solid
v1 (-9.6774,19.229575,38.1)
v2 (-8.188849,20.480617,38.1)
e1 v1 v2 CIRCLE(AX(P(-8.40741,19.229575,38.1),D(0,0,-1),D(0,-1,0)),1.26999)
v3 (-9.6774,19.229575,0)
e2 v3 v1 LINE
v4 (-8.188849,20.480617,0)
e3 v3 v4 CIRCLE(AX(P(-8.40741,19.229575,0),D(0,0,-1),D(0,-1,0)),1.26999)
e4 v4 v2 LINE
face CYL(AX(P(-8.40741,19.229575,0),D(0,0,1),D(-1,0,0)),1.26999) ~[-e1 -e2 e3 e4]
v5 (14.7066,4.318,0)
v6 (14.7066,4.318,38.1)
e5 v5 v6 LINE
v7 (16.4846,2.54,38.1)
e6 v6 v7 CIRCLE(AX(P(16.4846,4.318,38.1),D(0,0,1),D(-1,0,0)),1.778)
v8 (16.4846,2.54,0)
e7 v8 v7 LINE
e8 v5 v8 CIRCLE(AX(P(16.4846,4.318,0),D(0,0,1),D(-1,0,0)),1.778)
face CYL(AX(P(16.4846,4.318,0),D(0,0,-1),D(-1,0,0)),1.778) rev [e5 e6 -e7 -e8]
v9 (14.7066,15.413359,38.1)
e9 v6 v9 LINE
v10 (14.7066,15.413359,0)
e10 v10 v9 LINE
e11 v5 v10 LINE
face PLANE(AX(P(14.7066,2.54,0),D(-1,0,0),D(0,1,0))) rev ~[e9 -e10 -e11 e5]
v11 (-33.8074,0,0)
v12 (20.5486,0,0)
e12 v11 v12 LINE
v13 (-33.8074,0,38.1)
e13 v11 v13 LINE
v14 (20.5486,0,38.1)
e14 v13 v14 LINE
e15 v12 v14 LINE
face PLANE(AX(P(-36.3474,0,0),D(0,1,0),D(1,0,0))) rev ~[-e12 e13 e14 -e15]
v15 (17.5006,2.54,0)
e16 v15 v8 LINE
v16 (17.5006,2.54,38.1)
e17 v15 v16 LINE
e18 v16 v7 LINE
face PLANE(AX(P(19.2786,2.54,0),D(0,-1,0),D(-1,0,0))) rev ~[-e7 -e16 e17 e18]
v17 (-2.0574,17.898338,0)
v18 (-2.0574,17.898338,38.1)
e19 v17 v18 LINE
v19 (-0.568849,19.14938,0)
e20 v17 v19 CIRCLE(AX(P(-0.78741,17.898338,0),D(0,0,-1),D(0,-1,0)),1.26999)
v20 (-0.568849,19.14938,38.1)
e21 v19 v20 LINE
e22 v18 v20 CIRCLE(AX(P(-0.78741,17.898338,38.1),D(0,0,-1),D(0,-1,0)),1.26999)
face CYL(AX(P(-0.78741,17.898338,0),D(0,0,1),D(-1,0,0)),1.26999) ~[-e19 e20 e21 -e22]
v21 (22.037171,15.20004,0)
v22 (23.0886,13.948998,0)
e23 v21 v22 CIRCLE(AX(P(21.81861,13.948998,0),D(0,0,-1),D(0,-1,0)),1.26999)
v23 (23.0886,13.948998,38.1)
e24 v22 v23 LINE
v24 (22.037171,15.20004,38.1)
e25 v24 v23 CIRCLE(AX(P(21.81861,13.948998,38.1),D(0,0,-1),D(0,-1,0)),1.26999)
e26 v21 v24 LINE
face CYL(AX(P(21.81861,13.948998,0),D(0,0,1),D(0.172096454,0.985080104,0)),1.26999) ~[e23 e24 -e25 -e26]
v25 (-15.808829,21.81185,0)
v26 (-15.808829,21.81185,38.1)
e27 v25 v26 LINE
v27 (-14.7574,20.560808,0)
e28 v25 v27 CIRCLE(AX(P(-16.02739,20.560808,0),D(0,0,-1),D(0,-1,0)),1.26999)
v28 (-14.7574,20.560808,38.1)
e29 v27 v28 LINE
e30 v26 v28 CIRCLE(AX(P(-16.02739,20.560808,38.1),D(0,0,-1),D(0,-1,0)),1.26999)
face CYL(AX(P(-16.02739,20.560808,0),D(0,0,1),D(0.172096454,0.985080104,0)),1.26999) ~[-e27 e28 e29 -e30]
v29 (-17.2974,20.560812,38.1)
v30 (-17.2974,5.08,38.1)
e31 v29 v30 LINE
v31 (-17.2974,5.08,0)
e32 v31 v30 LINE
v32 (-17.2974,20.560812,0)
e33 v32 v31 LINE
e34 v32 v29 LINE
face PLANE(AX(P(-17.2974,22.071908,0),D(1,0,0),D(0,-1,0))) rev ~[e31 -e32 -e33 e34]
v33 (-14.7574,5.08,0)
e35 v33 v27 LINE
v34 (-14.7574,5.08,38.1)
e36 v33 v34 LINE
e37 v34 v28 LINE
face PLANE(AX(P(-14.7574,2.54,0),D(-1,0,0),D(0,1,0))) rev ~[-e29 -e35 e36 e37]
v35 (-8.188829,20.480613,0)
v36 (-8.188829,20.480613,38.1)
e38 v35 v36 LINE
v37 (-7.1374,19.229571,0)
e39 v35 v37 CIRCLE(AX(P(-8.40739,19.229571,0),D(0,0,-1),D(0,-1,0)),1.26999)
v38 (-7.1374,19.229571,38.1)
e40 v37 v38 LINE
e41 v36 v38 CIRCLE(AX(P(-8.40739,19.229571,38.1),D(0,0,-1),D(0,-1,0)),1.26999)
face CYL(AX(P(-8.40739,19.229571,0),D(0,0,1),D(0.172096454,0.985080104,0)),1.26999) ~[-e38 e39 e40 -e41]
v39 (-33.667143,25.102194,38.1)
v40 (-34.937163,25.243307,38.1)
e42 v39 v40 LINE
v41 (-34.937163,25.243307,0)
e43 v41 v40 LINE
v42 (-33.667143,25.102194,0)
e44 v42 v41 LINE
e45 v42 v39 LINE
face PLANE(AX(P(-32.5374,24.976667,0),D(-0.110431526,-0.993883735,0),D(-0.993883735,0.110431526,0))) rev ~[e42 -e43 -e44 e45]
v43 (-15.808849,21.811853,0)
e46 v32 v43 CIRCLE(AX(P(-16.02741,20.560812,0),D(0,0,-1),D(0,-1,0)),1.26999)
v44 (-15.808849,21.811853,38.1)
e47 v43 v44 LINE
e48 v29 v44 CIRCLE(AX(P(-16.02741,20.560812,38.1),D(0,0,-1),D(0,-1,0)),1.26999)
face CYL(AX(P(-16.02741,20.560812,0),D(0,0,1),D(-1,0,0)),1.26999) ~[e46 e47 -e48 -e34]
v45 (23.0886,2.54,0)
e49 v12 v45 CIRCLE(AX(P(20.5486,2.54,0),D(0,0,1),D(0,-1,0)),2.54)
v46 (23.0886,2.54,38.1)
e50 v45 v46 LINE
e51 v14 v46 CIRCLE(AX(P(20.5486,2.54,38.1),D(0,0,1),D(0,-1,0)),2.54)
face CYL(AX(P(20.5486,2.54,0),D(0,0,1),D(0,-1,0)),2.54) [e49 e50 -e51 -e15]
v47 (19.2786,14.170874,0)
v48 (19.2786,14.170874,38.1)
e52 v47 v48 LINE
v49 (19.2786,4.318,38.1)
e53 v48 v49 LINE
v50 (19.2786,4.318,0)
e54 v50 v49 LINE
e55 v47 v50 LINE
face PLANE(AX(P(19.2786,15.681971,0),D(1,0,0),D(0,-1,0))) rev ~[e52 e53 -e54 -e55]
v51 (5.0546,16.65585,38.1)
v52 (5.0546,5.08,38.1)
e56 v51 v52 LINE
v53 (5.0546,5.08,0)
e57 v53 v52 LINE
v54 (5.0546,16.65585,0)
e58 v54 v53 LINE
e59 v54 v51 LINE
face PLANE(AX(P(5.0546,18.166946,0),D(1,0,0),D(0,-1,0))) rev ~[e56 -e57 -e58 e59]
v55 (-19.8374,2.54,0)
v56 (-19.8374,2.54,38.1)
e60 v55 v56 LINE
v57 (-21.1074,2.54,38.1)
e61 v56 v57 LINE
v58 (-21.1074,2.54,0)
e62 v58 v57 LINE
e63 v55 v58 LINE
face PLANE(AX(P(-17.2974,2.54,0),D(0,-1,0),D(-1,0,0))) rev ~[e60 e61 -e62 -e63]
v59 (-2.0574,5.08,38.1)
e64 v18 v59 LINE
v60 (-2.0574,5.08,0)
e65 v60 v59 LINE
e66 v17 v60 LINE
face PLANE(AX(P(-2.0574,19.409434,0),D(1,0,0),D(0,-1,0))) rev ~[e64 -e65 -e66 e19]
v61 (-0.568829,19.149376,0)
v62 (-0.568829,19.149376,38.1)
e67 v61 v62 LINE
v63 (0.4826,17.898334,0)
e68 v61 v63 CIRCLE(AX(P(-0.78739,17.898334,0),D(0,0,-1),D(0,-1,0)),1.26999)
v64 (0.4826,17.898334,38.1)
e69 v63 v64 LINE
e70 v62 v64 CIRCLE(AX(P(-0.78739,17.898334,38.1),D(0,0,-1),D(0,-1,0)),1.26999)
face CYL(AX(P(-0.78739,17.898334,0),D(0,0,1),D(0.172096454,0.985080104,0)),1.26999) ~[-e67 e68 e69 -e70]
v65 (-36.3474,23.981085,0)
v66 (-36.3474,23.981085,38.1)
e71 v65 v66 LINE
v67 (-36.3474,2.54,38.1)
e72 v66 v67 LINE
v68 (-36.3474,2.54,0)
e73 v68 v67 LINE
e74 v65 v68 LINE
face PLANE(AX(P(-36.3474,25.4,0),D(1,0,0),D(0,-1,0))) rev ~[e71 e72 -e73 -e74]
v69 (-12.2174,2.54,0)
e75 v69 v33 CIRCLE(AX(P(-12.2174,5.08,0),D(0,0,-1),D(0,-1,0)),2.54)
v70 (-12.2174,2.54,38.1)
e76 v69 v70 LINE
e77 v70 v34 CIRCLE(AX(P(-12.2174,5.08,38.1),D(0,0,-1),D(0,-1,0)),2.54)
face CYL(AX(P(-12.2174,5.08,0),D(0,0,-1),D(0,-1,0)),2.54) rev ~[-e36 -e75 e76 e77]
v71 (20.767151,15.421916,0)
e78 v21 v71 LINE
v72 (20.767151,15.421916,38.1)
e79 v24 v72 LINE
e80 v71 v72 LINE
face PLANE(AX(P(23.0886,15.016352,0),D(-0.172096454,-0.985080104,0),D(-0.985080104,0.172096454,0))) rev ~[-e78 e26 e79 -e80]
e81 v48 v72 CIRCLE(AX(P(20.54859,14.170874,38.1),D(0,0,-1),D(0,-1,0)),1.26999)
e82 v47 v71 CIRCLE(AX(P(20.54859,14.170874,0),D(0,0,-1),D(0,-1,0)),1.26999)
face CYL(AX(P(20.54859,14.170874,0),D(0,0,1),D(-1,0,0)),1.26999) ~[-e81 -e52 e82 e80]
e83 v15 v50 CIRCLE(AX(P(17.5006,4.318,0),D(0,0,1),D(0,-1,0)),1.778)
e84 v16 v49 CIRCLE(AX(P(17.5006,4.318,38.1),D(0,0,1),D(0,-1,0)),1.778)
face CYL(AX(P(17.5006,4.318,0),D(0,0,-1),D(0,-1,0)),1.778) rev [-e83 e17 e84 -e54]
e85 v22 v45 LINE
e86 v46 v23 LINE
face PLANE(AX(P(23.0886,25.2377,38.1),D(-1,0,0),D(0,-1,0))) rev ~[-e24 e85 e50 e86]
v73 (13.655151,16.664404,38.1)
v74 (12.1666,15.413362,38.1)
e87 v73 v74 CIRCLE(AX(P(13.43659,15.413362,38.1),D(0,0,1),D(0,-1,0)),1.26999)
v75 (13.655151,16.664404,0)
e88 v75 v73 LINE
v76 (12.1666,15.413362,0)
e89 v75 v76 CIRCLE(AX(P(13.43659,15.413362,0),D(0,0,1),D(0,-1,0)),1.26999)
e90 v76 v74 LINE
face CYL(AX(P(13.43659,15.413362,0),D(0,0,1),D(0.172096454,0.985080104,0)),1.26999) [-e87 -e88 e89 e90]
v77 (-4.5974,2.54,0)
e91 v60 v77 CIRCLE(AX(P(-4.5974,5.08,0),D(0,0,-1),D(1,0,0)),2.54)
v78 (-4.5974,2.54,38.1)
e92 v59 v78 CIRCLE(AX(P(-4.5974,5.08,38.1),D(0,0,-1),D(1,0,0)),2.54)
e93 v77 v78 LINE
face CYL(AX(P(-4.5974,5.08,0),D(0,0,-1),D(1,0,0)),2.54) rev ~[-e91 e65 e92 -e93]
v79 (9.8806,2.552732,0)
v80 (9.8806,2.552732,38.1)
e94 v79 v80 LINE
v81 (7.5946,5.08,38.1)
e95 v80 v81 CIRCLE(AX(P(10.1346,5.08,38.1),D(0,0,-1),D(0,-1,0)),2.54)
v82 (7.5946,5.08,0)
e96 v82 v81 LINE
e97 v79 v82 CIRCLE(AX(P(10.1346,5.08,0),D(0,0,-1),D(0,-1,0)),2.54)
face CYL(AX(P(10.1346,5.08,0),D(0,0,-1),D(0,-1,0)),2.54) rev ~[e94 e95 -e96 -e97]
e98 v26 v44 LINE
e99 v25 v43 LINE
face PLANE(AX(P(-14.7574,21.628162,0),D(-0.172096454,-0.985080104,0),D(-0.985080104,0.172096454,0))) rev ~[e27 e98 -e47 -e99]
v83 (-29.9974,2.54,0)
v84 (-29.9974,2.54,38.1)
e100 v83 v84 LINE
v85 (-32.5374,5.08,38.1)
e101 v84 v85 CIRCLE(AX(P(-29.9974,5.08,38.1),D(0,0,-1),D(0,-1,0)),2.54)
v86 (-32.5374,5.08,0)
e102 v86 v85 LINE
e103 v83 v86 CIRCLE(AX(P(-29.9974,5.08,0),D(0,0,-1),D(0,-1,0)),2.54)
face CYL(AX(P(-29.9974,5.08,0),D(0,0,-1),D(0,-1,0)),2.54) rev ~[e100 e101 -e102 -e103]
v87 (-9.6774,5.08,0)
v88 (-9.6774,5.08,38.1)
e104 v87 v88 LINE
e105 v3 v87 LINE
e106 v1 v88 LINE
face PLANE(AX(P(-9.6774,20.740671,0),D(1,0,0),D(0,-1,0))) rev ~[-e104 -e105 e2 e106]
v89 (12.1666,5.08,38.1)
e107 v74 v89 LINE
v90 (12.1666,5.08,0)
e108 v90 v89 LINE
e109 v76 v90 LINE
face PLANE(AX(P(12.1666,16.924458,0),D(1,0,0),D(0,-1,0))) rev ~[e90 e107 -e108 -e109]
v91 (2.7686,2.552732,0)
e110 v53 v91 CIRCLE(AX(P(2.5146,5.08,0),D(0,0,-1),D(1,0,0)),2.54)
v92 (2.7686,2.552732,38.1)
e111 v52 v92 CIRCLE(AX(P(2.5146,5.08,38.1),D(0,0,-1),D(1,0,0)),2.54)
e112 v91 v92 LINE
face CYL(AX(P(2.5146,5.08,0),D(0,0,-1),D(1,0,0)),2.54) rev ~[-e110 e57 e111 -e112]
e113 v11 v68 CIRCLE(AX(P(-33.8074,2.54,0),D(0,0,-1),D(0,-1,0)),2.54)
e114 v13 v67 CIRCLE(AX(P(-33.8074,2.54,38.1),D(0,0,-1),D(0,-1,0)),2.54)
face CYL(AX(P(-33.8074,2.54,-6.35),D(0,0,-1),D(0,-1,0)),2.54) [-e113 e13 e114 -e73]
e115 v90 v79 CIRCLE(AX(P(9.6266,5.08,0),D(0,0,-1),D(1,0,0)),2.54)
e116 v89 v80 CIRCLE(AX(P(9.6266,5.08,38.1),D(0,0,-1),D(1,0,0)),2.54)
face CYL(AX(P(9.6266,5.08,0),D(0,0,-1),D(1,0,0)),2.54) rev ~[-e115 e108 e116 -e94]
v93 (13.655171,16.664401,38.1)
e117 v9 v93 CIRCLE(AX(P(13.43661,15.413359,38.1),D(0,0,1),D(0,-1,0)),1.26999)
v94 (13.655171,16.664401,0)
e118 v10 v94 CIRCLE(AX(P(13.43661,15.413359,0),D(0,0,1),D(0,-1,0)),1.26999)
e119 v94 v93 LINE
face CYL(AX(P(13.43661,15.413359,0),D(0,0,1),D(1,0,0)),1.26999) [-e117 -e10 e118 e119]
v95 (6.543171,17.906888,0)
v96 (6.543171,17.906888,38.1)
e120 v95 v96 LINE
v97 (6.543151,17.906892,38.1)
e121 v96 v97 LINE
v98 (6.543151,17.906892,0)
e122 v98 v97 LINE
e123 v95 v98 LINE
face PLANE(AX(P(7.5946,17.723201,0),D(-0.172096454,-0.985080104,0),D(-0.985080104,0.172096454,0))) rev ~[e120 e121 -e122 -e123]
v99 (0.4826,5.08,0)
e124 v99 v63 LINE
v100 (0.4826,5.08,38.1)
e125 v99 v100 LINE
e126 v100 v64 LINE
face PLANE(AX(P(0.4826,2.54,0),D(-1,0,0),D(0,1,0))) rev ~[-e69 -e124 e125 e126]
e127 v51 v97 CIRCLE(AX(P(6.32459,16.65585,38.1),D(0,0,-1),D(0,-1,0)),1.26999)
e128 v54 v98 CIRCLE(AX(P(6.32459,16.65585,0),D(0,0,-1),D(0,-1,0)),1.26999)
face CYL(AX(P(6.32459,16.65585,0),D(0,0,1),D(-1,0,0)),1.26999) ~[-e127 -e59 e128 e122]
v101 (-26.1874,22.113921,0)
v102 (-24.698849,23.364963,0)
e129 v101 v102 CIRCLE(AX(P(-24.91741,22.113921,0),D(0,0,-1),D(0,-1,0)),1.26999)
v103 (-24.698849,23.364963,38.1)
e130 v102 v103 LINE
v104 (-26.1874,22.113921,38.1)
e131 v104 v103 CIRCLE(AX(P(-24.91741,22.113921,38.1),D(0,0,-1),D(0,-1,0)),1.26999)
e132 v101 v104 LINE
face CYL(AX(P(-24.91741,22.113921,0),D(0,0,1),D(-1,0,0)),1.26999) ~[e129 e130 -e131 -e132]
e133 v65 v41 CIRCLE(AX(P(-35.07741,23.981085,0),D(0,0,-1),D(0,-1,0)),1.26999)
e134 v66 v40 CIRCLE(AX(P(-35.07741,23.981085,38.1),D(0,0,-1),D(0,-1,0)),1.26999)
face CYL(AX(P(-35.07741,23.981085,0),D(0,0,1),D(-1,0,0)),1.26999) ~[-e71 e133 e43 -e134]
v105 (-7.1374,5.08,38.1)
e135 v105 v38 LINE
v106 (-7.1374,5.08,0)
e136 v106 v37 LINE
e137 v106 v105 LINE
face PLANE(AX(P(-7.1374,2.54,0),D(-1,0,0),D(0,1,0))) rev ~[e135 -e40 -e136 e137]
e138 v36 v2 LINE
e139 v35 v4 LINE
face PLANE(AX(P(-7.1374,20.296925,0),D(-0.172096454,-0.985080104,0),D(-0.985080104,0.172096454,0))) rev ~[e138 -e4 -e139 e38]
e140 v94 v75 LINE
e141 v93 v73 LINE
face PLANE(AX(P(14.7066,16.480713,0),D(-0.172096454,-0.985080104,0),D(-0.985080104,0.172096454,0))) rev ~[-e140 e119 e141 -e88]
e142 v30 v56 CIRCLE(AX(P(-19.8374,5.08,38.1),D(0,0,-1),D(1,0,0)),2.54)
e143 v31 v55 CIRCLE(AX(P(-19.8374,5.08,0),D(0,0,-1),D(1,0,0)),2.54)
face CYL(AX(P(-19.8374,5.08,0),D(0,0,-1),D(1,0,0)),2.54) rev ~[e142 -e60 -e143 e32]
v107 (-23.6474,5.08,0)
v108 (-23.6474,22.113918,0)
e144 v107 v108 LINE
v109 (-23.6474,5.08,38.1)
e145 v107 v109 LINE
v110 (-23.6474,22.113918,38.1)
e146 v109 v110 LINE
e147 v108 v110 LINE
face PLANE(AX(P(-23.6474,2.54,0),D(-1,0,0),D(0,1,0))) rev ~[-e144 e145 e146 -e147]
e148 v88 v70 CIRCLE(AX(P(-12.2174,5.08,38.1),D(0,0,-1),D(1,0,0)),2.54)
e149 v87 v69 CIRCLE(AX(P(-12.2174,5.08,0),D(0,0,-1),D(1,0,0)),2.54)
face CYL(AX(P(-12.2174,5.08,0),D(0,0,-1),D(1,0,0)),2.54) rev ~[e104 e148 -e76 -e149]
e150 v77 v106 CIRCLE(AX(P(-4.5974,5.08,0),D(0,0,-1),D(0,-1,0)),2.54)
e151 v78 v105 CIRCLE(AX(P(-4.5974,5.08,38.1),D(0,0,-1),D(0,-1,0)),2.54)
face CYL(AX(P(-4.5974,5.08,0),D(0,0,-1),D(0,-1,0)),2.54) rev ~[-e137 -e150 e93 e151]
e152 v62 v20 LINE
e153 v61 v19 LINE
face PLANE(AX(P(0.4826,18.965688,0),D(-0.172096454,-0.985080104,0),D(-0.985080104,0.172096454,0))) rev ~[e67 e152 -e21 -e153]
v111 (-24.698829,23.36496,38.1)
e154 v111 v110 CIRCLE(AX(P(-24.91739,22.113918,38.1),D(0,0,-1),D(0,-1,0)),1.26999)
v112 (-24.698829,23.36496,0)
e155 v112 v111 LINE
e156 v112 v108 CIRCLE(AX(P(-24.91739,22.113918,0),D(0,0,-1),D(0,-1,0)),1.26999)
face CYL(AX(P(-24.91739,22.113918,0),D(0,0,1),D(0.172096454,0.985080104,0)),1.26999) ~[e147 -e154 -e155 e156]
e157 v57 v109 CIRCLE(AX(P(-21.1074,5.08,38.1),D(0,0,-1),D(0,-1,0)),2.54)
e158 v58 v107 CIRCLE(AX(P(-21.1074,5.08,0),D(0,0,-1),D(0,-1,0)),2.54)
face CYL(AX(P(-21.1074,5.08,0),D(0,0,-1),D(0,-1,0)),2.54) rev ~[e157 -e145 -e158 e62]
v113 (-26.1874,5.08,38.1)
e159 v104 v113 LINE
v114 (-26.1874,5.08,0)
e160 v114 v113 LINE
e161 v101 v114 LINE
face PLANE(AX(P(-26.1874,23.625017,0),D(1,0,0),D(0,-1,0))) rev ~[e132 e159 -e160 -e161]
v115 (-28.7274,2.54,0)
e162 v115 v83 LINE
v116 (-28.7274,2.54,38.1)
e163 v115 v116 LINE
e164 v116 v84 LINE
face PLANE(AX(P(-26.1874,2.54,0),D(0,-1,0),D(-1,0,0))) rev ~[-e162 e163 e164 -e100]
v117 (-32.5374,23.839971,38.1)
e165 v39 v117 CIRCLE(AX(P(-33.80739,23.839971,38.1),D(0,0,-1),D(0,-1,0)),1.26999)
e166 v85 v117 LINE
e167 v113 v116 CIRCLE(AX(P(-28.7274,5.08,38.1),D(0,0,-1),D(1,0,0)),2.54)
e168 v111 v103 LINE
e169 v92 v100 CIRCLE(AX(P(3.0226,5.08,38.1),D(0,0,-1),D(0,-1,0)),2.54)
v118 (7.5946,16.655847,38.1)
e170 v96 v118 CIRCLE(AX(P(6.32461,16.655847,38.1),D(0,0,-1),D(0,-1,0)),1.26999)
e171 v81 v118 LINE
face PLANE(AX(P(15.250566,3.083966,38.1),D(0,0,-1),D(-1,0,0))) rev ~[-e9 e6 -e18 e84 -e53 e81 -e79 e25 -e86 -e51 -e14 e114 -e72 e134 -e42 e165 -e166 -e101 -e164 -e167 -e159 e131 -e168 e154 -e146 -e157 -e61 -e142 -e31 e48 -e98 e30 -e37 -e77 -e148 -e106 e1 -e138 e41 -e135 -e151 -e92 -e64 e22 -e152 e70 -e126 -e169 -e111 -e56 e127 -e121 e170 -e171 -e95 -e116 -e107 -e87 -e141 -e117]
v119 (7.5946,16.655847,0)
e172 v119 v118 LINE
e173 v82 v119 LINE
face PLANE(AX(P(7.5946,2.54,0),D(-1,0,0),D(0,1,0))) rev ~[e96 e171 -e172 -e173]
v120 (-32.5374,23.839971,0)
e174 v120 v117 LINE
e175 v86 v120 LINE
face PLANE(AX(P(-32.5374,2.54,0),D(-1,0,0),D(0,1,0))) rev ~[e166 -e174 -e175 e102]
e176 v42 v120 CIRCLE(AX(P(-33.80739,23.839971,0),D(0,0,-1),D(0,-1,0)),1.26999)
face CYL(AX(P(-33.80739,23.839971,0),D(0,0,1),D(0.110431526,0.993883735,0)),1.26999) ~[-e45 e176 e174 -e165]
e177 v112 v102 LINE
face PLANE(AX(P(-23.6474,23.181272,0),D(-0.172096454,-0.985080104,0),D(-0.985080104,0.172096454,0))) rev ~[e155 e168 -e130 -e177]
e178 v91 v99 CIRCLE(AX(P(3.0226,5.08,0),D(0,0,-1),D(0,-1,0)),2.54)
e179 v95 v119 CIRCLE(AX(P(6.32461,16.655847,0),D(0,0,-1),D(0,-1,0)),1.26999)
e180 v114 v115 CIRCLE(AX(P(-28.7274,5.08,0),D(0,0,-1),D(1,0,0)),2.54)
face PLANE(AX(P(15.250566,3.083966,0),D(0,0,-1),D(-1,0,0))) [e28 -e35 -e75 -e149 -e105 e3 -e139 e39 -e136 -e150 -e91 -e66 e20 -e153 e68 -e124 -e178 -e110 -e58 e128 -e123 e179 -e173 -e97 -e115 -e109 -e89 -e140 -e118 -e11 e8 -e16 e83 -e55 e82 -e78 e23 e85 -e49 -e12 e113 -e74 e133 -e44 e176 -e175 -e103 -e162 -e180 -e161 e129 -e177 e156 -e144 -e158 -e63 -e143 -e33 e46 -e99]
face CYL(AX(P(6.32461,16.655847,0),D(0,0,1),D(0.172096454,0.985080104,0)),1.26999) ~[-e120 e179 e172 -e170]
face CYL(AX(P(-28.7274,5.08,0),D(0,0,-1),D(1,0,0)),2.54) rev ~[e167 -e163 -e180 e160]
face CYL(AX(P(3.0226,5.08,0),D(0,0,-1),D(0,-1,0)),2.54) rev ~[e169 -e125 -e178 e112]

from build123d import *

# Parameters (mm, degrees)
F1_DEPTH    = 38.1
F2_T1_DEPTH = 38.1
F2_T3_DEPTH = 50.8
F3_T1_DEPTH = 38.1
F4_R        = 1.26999
F5_W        = 23.6700927116
F5_H        = 11.2887102096
F6_DEPTH    = 38.101
F7_R        = 2.54


# Not quite as in the source:
# - a fillet or chamfer that OpenCascade refuses, or shapes differently, is made with other operations: its cross-section is extruded or revolved along the edge and cut away or added
# - a fillet or chamfer is up to 0.001 mm smaller than in the source, because OpenCascade refuses the exact size


with BuildPart() as f1:
    # F0 (on Top) → F1 (new body)
    with BuildSketch(Plane.XY):
        Polygon((-36.3474, 25.4), (-36.3474, 0), (36.3474, 0), (36.3474, 12.7), (32.5374, 13.3656184486), (32.5374, 2.54), (29.337, 2.54), (29.337, 13.9247379455), (26.797, 14.3684835779), (26.797, 2.54), (23.0886, 2.54), (23.0886, 15.0163522013), (19.2786, 15.6819706499), (19.2786, 2.54), (14.7066, 2.54), (14.7066, 16.4807127883), (12.1666, 16.9244584207), (12.1666, 2.54), (7.5946, 2.54), (7.5946, 17.723200559), (5.0546, 18.1669461915), (5.0546, 2.54), (0.4826, 2.54), (0.4826, 18.9656883298), (-2.0574, 19.4094339623), (-2.0574, 2.54), (-7.1374, 2.54), (-7.1374, 20.2969252271), (-9.6774, 20.7406708595), (-9.6774, 2.54), (-14.7574, 2.54), (-14.7574, 21.6281621244), (-17.2974, 22.0719077568), (-17.2974, 2.54), (-23.6474, 2.54), (-23.6474, 23.1812718379), (-26.1874, 23.6250174703), (-26.1874, 2.54), (-32.5374, 2.54), (-32.5374, 24.9766666667), align=None)
    extrude(amount=F1_DEPTH)

    # F2: fillet of radius 2.54 on 14 edges, made by hand

    # F2_s2 → F2_t1 (join)
    with BuildSketch(Plane.XY):
        with BuildLine():
            ThreePointArc((-29.9974, 2.54), (-31.7934512242, 3.2839487758), (-32.5374, 5.08))
            Line((-32.5374, 5.08), (-32.5374, 2.54))
            Line((-32.5374, 2.54), (-29.9974, 2.54))
        make_face()
        with BuildLine():
            ThreePointArc((-26.1874, 5.08), (-26.9313487758, 3.2839487758), (-28.7274, 2.54))
            Line((-28.7274, 2.54), (-26.1874, 2.54))
            Line((-26.1874, 2.54), (-26.1874, 5.08))
        make_face()
        with BuildLine():
            ThreePointArc((-21.1074, 2.54), (-22.9034512242, 3.2839487758), (-23.6474, 5.08))
            Line((-23.6474, 5.08), (-23.6474, 2.54))
            Line((-23.6474, 2.54), (-21.1074, 2.54))
        make_face()
        with BuildLine():
            ThreePointArc((-17.2974, 5.08), (-18.0413487758, 3.2839487758), (-19.8374, 2.54))
            Line((-19.8374, 2.54), (-17.2974, 2.54))
            Line((-17.2974, 2.54), (-17.2974, 5.08))
        make_face()
        with BuildLine():
            ThreePointArc((-12.2174, 2.54), (-14.0134512242, 3.2839487758), (-14.7574, 5.08))
            Line((-14.7574, 5.08), (-14.7574, 2.54))
            Line((-14.7574, 2.54), (-12.2174, 2.54))
        make_face()
        with BuildLine():
            ThreePointArc((-9.6774, 5.08), (-10.4213487758, 3.2839487758), (-12.2174, 2.54))
            Line((-12.2174, 2.54), (-9.6774, 2.54))
            Line((-9.6774, 2.54), (-9.6774, 5.08))
        make_face()
        with BuildLine():
            ThreePointArc((-4.5974, 2.54), (-6.3934512242, 3.2839487758), (-7.1374, 5.08))
            Line((-7.1374, 5.08), (-7.1374, 2.54))
            Line((-7.1374, 2.54), (-4.5974, 2.54))
        make_face()
        with BuildLine():
            ThreePointArc((-2.0574, 5.08), (-2.8013487758, 3.2839487758), (-4.5974, 2.54))
            Line((-4.5974, 2.54), (-2.0574, 2.54))
            Line((-2.0574, 2.54), (-2.0574, 5.08))
        make_face()
        with BuildLine():
            ThreePointArc((3.0226, 2.54), (1.2265487758, 3.2839487758), (0.4826, 5.08))
            Line((0.4826, 5.08), (0.4826, 2.54))
            Line((0.4826, 2.54), (3.0226, 2.54))
        make_face()
        with BuildLine():
            ThreePointArc((5.0546, 5.08), (4.3106512242, 3.2839487758), (2.5146, 2.54))
            Line((2.5146, 2.54), (5.0546, 2.54))
            Line((5.0546, 2.54), (5.0546, 5.08))
        make_face()
        with BuildLine():
            ThreePointArc((10.1346, 2.54), (8.3385487758, 3.2839487758), (7.5946, 5.08))
            Line((7.5946, 5.08), (7.5946, 2.54))
            Line((7.5946, 2.54), (10.1346, 2.54))
        make_face()
        with BuildLine():
            ThreePointArc((12.1666, 5.08), (11.4226512242, 3.2839487758), (9.6266, 2.54))
            Line((9.6266, 2.54), (12.1666, 2.54))
            Line((12.1666, 2.54), (12.1666, 5.08))
        make_face()
    extrude(amount=F2_T1_DEPTH)

    # F2_s4 → F2_t3 (cut)
    with BuildSketch(Plane.XY.offset(-6.35)):
        with BuildLine():
            ThreePointArc((-33.8074, 0), (-35.6034512242, 0.7439487758), (-36.3474, 2.54))
            Line((-36.3474, 2.54), (-36.3474, 0))
            Line((-36.3474, 0), (-33.8074, 0))
        make_face()
        with BuildLine():
            ThreePointArc((36.3474, 2.54), (35.6034512242, 0.7439487758), (33.8074, 0))
            Line((33.8074, 0), (36.3474, 0))
            Line((36.3474, 0), (36.3474, 2.54))
        make_face()
    extrude(amount=F2_T3_DEPTH, mode=Mode.SUBTRACT)

    # F3: fillet of radius 1.778 on 6 edges, made by hand

    # F3_s2 → F3_t1 (join)
    with BuildSketch(Plane.XY):
        with BuildLine():
            ThreePointArc((14.7066, 4.318), (15.2273641431, 3.0607641431), (16.4846, 2.54))
            Line((16.4846, 2.54), (14.7066, 2.54))
            Line((14.7066, 2.54), (14.7066, 4.318))
        make_face()
        with BuildLine():
            ThreePointArc((17.5006, 2.54), (18.7578358569, 3.0607641431), (19.2786, 4.318))
            Line((19.2786, 4.318), (19.2786, 2.54))
            Line((19.2786, 2.54), (17.5006, 2.54))
        make_face()
        with BuildLine():
            ThreePointArc((23.0886, 4.318), (23.6093641431, 3.0607641431), (24.8666, 2.54))
            Line((24.8666, 2.54), (23.0886, 2.54))
            Line((23.0886, 2.54), (23.0886, 4.318))
        make_face()
        with BuildLine():
            ThreePointArc((25.019, 2.54), (26.2762358569, 3.0607641431), (26.797, 4.318))
            Line((26.797, 4.318), (26.797, 2.54))
            Line((26.797, 2.54), (25.019, 2.54))
        make_face()
        with BuildLine():
            ThreePointArc((29.337, 4.318), (29.8577641431, 3.0607641431), (31.115, 2.54))
            Line((31.115, 2.54), (29.337, 2.54))
            Line((29.337, 2.54), (29.337, 4.318))
        make_face()
        with BuildLine():
            ThreePointArc((30.7594, 2.54), (32.0166358569, 3.0607641431), (32.5374, 4.318))
            Line((32.5374, 4.318), (32.5374, 2.54))
            Line((32.5374, 2.54), (30.7594, 2.54))
        make_face()
    extrude(amount=F3_T1_DEPTH)

    # F4 (radius 1.27 in the source; OpenCascade refuses exactly that, so slightly less here)
    f4_edges = [f1.edges().sort_by_distance(p)[0] for p in [
        (32.5374, 13.365618, 19.05),
        (29.337, 13.924738, 19.05),
        (26.797, 14.368484, 19.05),
        (23.0886, 15.016352, 19.05),
        (19.2786, 15.681971, 19.05),
        (14.7066, 16.480713, 19.05),
        (12.1666, 16.924458, 19.05),
        (7.5946, 17.723201, 19.05),
        (5.0546, 18.166946, 19.05),
        (0.4826, 18.965688, 19.05),
        (-2.0574, 19.409434, 19.05),
        (-7.1374, 20.296925, 19.05),
        (-14.7574, 21.628162, 19.05),
        (-23.6474, 23.181272, 19.05),
        (-26.1874, 23.625017, 19.05),
        (-32.5374, 24.976667, 19.05),
        (-36.3474, 25.4, 19.05),
        (36.3474, 12.7, 19.05),
        (-9.6774, 20.740671, 19.05),
        (-17.2974, 22.071908, 19.05),
    ]]
    fillet(f4_edges, radius=F4_R)

    # F5 (on face) → F6 (cut, through all)
    with BuildSketch(Plane.XY.offset(38.1)):
        with Locations((34.9236463558, 19.5933448658)):
            Rectangle(F5_W, F5_H)
        Polygon((46.7586927116, 13.948989761), (23.0886, 13.948989761), (23.0886, -14.5505452529), (53.0812069774, -14.5505452529), (53.0812069774, 13.948989761), align=None)
    extrude(amount=-F6_DEPTH, mode=Mode.SUBTRACT)

    # F7
    f7_edges = [f1.edges().sort_by_distance(p)[0] for p in [
        (23.0886, 0, 19.05),
    ]]
    fillet(f7_edges, radius=F7_R)


solid = f1.part
